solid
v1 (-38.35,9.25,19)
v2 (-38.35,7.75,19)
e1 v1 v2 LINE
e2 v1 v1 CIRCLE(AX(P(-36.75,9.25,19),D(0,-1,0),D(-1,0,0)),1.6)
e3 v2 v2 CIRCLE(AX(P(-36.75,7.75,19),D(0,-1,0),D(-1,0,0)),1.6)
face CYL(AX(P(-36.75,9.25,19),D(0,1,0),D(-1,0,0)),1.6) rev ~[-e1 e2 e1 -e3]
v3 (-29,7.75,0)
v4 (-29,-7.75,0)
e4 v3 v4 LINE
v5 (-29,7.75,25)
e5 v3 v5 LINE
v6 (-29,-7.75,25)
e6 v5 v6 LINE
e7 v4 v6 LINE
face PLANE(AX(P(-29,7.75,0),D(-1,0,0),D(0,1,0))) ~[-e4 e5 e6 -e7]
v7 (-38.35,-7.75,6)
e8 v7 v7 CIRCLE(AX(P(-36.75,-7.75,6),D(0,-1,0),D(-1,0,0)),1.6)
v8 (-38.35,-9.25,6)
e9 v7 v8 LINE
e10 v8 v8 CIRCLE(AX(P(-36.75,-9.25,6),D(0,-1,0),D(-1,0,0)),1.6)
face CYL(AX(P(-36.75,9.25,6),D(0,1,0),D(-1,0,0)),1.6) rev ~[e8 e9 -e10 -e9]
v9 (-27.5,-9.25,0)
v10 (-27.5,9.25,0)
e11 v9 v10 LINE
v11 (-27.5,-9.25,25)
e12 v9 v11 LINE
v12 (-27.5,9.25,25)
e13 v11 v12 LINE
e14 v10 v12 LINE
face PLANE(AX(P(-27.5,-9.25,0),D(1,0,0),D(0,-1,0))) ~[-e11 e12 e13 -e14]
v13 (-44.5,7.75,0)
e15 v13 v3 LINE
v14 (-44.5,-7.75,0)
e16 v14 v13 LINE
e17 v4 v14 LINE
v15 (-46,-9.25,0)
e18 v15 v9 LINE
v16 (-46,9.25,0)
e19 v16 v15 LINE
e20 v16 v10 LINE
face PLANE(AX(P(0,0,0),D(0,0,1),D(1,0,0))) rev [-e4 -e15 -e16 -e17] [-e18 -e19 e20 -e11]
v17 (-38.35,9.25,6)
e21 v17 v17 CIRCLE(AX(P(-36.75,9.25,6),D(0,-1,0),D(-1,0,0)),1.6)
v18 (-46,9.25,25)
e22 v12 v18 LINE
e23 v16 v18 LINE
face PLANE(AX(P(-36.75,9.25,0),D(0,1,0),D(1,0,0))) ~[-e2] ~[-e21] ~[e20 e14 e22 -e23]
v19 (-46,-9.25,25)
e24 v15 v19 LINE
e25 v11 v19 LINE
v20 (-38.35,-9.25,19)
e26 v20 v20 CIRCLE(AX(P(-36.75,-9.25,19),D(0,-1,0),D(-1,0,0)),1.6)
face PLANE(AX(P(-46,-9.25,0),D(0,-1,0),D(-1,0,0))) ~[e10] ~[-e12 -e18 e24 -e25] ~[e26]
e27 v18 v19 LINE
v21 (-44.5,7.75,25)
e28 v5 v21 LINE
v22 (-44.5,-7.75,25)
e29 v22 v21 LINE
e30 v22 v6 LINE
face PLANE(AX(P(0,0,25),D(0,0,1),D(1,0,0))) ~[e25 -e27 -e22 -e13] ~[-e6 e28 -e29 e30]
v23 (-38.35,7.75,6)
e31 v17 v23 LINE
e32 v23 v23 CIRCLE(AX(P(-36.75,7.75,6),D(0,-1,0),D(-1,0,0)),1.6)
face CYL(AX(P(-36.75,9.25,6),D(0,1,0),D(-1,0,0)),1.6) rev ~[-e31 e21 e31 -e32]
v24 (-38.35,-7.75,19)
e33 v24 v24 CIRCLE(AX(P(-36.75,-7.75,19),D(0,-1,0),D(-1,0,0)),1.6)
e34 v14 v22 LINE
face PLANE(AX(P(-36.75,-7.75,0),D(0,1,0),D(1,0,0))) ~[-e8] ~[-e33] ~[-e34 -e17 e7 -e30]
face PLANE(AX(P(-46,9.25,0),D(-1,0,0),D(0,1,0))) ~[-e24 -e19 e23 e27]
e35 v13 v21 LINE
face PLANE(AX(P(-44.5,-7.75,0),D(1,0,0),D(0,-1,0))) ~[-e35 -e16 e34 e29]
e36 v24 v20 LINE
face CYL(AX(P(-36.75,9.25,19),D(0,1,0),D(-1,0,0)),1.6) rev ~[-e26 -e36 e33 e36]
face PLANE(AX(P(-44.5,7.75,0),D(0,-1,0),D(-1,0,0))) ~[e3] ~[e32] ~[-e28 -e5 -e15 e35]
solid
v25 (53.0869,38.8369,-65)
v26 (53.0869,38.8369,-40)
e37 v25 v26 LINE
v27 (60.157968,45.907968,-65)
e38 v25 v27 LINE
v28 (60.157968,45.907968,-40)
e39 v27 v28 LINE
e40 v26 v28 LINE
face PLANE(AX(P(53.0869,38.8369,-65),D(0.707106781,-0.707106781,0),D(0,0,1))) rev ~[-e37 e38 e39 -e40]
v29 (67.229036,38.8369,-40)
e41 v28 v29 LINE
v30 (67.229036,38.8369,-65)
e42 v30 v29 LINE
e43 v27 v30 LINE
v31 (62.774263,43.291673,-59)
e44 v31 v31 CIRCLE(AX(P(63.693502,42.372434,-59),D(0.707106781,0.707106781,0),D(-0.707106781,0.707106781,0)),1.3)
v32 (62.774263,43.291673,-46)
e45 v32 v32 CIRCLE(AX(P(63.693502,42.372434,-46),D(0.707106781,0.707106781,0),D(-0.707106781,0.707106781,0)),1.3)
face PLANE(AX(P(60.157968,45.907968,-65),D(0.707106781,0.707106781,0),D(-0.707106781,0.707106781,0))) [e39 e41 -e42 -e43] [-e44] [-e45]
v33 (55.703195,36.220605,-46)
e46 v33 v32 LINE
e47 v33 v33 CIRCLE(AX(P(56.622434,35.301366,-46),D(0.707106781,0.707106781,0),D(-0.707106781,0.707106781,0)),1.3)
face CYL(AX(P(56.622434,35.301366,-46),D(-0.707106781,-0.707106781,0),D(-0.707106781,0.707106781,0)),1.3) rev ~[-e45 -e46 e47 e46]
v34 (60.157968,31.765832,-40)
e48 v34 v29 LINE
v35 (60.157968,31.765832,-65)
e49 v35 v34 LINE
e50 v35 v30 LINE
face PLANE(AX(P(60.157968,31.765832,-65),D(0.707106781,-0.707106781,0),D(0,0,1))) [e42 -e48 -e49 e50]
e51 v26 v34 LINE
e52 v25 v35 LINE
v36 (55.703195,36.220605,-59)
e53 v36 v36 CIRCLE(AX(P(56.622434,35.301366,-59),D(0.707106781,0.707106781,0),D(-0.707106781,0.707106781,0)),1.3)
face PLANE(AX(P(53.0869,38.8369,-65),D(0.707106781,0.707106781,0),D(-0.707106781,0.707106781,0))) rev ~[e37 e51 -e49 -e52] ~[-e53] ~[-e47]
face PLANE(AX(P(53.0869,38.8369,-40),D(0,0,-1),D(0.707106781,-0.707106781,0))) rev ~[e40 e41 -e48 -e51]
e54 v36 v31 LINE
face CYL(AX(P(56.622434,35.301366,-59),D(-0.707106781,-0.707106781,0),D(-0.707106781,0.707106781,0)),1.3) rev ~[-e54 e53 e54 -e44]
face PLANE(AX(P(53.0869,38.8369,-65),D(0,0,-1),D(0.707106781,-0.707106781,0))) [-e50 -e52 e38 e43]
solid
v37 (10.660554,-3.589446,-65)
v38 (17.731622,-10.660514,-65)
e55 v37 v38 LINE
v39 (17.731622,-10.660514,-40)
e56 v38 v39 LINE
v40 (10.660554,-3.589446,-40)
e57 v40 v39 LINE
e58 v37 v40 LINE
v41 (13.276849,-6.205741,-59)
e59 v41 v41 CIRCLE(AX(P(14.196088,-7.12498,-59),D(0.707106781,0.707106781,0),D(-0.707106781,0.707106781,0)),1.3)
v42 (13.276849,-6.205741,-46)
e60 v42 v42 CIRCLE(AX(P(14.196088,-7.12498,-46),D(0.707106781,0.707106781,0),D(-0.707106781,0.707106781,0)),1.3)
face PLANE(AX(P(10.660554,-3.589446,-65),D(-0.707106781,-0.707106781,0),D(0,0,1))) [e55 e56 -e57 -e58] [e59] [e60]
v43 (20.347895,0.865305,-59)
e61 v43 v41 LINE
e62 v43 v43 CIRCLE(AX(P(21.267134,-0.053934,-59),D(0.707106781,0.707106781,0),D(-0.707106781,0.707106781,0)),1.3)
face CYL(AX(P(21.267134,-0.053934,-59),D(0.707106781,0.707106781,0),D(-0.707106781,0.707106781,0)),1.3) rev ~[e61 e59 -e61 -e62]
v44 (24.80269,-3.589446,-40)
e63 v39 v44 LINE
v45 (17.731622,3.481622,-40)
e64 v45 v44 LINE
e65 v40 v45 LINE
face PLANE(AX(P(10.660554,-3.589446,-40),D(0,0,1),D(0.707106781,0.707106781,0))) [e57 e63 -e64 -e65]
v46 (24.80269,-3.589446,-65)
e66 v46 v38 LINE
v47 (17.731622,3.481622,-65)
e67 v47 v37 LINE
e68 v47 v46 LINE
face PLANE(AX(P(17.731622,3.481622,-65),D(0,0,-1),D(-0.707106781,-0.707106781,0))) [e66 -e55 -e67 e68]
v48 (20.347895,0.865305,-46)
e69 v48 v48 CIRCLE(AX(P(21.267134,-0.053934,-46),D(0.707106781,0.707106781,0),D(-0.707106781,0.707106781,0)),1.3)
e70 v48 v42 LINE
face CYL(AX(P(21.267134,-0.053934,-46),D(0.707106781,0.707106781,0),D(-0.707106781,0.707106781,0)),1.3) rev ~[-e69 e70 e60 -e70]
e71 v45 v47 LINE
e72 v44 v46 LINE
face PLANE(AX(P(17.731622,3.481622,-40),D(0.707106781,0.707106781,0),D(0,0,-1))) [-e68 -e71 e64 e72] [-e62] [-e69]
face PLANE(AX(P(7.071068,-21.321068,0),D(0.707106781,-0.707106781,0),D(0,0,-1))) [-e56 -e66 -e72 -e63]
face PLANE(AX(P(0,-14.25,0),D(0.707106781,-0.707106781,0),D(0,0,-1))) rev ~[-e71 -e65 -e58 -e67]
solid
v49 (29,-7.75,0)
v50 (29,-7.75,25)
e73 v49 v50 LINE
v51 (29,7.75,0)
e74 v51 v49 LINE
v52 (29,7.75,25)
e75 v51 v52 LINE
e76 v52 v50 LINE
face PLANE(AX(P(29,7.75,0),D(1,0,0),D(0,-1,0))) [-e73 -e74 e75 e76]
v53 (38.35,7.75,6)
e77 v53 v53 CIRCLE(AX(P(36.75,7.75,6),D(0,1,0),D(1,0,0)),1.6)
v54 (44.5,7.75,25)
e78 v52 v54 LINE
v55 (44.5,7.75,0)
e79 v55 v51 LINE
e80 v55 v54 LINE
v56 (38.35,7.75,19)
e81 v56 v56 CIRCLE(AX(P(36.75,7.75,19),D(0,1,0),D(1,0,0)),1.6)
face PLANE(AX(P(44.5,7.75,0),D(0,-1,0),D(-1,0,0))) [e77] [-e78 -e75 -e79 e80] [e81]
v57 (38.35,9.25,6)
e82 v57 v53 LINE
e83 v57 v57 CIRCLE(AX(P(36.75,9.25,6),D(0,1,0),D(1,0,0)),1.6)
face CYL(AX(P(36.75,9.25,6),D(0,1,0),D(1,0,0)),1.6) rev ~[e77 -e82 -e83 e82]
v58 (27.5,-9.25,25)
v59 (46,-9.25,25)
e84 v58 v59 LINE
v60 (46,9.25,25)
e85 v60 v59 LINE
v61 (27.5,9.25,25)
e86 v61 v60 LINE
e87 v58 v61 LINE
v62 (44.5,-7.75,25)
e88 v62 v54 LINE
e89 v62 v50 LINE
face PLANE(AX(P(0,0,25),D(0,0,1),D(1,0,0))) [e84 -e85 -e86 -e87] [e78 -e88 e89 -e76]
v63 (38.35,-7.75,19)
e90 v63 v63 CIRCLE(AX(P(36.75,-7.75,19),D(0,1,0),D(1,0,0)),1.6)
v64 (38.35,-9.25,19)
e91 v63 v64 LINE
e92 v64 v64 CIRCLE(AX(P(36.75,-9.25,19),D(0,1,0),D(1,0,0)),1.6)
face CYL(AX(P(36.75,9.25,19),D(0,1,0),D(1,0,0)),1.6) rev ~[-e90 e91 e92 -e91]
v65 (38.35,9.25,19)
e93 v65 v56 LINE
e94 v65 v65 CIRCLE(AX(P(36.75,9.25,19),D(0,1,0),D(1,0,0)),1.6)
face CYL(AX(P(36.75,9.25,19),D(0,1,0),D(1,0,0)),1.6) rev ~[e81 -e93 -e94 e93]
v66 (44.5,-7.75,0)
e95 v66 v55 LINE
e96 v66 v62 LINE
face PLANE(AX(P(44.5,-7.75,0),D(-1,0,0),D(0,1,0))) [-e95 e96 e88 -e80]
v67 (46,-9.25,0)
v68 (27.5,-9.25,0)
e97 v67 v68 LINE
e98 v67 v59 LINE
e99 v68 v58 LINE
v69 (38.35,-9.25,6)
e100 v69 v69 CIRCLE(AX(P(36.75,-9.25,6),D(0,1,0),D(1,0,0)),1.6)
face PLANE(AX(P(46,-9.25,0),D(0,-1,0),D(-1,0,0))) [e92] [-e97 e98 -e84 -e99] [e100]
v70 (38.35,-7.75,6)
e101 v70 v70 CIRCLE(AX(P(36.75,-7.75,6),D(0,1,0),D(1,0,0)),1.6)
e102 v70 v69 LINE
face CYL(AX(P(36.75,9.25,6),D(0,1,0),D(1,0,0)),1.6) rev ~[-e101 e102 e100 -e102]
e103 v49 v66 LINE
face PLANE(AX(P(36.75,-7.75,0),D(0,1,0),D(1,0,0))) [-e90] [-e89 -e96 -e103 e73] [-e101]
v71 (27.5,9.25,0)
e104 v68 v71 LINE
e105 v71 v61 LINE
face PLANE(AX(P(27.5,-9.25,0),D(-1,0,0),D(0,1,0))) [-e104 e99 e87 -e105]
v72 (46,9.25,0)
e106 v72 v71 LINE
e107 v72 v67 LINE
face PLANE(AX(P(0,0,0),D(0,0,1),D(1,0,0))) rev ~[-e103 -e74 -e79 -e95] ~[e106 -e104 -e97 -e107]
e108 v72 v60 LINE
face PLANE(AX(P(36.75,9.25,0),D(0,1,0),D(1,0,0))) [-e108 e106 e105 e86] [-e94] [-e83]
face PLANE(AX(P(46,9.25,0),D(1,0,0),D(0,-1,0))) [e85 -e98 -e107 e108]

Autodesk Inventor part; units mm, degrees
ref_plane "作業平面1" through (36.75, 0, 0) normal (1, 0, 0) x (0, 1, 0)
sketch "スケッチ1" plane through (0, 0, 0) normal (0, 0, 1) x (1, 0, 0)
  line L0 (36.75, 12.95) -> (36.75, -12.95) projected
  line L1 (29, -7.75) -> (44.5, -7.75)
  line L2 (44.5, -7.75) -> (44.5, 7.75)
  line L3 (44.5, 7.75) -> (29, 7.75)
  line L4 (29, 7.75) -> (29, -7.75)
  line L5 (29, -7.75) -> (44.5, 7.75) construction
  line L6 (44.5, -7.75) -> (29, 7.75) construction
  line L7 (46, -9.25) -> (27.5, -9.25)
  line L8 (27.5, -9.25) -> (27.5, 9.25)
  line L9 (27.5, 9.25) -> (46, 9.25)
  line L10 (46, 9.25) -> (46, -9.25)
  line L11 (46, -9.25) -> (27.5, 9.25) construction
  line L12 (27.5, -9.25) -> (46, 9.25) construction
  point P0 (0, 0)
  point P1 (36.75, 0)
  dimension "d1" = 15.5
  dimension "d2" = 1.5
extrude "押し出し1" add sketch "スケッチ1" along normal blind 25 contours L9 L10 L7 L0 L1 L2 L3 | L0 L3 L4 L1 L7 L8 L9
sketch "スケッチ2" plane through (27.5, 9.25, 0) normal (0, 1, 0) x (1, 0, 0)
  circle A0 centre (9.25, -19) radius 1.6
  line L0 (18.5, -25) -> (0, -25) projected
  circle A1 centre (9.25, -6) radius 1.6
  point P0 (-27.5, 0)
  point P1 (9.25, -25)
  dimension "d5" = 3.2
  dimension "d6" = 6
  dimension "d7" = 3.2
  dimension "d8" = 13
extrude "押し出し2" cut sketch "スケッチ2" against normal through all
ref_plane "作業平面2" through (27.5, 0, 0) normal (0, 1, 0) x (1, 0, 0)
mirror "ミラー1" about plane through (0, 0, 0) normal (1, 0, 0)
ref_plane "作業平面3" through (-27.5, -40, -9.25) normal (1, 0, 0) x (0, 0, -1)
ref_plane "作業平面4" through (-27.5, 1.5, 40) normal (0, 1, 0) x (1, 0, 0)
ref_plane "作業平面5" through (27.5, -14.25, 0) normal (0, -1, 0) x (1, 0, 0)
ref_plane "作業平面6" through (0, -14.25, 0) normal (0.7071068, -0.7071068, 0) x (0, 0, -1)
sketch "スケッチ10" plane through (0, -14.25, 0) normal (0.7071068, -0.7071068, 0) x (0, 0, -1)
  line L0 (40, 25.0763) -> (65, 25.0763)
  line L1 (65, 25.0763) -> (65, 15.0763)
  line L2 (65, 15.0763) -> (40, 15.0763)
  line L3 (40, 15.0763) -> (40, 25.0763)
  point P0 (0, 10.0763)
  point P1 (40, 20.0763)
  dimension "d78" = 25
  dimension "d79" = 10
  dimension "d81" = 40
  dimension "d90" = 10
extrude "押し出し10" add sketch "スケッチ10" along normal blind 10
sketch "スケッチ11" plane through (17.7316, 3.4816, -65) normal (0.7071068, 0.7071068, 0) x (-0.7071068, 0.7071068, 0)
  circle A0 centre (-5, 19) radius 1.3
  circle A1 centre (-5, 6) radius 1.3
  line L0 (0, 25) -> (-10, 25) projected
  line L1 (0, 0) -> (-10, 0) projected
  point P0 (10.0763, 65)
  point P1 (-5, 25)
  point P2 (-5, 25)
  dimension "d84" = 6
  dimension "d85" = 6
  dimension "d86" = 2.6
extrude "押し出し11" cut sketch "スケッチ11" against normal through all
ref_plane "作業平面8" through (53.0869, 38.8369, -65) normal (0.7071068, 0.7071068, 0) x (-0.7071068, 0.7071068, 0)
sketch "スケッチ13" plane through (53.0869, 38.8369, -65) normal (0.7071068, 0.7071068, 0) x (-0.7071068, 0.7071068, 0)
  circle A0 centre (-5, 19) radius 1.3 projected
  circle A1 centre (-5, 6) radius 1.3 projected
  line L0 (0, 0) -> (0, 25) projected
  line L1 (0, 25) -> (-10, 25) projected
  line L2 (-10, 0) -> (-10, 25) projected
  line L3 (0, 0) -> (-10, 0) projected
  point P0 (10.0763, 65)
extrude "押し出し13" add sketch "スケッチ13" along normal blind 10
equation "\"d5\" = d7"
properties part number "45_deg"
